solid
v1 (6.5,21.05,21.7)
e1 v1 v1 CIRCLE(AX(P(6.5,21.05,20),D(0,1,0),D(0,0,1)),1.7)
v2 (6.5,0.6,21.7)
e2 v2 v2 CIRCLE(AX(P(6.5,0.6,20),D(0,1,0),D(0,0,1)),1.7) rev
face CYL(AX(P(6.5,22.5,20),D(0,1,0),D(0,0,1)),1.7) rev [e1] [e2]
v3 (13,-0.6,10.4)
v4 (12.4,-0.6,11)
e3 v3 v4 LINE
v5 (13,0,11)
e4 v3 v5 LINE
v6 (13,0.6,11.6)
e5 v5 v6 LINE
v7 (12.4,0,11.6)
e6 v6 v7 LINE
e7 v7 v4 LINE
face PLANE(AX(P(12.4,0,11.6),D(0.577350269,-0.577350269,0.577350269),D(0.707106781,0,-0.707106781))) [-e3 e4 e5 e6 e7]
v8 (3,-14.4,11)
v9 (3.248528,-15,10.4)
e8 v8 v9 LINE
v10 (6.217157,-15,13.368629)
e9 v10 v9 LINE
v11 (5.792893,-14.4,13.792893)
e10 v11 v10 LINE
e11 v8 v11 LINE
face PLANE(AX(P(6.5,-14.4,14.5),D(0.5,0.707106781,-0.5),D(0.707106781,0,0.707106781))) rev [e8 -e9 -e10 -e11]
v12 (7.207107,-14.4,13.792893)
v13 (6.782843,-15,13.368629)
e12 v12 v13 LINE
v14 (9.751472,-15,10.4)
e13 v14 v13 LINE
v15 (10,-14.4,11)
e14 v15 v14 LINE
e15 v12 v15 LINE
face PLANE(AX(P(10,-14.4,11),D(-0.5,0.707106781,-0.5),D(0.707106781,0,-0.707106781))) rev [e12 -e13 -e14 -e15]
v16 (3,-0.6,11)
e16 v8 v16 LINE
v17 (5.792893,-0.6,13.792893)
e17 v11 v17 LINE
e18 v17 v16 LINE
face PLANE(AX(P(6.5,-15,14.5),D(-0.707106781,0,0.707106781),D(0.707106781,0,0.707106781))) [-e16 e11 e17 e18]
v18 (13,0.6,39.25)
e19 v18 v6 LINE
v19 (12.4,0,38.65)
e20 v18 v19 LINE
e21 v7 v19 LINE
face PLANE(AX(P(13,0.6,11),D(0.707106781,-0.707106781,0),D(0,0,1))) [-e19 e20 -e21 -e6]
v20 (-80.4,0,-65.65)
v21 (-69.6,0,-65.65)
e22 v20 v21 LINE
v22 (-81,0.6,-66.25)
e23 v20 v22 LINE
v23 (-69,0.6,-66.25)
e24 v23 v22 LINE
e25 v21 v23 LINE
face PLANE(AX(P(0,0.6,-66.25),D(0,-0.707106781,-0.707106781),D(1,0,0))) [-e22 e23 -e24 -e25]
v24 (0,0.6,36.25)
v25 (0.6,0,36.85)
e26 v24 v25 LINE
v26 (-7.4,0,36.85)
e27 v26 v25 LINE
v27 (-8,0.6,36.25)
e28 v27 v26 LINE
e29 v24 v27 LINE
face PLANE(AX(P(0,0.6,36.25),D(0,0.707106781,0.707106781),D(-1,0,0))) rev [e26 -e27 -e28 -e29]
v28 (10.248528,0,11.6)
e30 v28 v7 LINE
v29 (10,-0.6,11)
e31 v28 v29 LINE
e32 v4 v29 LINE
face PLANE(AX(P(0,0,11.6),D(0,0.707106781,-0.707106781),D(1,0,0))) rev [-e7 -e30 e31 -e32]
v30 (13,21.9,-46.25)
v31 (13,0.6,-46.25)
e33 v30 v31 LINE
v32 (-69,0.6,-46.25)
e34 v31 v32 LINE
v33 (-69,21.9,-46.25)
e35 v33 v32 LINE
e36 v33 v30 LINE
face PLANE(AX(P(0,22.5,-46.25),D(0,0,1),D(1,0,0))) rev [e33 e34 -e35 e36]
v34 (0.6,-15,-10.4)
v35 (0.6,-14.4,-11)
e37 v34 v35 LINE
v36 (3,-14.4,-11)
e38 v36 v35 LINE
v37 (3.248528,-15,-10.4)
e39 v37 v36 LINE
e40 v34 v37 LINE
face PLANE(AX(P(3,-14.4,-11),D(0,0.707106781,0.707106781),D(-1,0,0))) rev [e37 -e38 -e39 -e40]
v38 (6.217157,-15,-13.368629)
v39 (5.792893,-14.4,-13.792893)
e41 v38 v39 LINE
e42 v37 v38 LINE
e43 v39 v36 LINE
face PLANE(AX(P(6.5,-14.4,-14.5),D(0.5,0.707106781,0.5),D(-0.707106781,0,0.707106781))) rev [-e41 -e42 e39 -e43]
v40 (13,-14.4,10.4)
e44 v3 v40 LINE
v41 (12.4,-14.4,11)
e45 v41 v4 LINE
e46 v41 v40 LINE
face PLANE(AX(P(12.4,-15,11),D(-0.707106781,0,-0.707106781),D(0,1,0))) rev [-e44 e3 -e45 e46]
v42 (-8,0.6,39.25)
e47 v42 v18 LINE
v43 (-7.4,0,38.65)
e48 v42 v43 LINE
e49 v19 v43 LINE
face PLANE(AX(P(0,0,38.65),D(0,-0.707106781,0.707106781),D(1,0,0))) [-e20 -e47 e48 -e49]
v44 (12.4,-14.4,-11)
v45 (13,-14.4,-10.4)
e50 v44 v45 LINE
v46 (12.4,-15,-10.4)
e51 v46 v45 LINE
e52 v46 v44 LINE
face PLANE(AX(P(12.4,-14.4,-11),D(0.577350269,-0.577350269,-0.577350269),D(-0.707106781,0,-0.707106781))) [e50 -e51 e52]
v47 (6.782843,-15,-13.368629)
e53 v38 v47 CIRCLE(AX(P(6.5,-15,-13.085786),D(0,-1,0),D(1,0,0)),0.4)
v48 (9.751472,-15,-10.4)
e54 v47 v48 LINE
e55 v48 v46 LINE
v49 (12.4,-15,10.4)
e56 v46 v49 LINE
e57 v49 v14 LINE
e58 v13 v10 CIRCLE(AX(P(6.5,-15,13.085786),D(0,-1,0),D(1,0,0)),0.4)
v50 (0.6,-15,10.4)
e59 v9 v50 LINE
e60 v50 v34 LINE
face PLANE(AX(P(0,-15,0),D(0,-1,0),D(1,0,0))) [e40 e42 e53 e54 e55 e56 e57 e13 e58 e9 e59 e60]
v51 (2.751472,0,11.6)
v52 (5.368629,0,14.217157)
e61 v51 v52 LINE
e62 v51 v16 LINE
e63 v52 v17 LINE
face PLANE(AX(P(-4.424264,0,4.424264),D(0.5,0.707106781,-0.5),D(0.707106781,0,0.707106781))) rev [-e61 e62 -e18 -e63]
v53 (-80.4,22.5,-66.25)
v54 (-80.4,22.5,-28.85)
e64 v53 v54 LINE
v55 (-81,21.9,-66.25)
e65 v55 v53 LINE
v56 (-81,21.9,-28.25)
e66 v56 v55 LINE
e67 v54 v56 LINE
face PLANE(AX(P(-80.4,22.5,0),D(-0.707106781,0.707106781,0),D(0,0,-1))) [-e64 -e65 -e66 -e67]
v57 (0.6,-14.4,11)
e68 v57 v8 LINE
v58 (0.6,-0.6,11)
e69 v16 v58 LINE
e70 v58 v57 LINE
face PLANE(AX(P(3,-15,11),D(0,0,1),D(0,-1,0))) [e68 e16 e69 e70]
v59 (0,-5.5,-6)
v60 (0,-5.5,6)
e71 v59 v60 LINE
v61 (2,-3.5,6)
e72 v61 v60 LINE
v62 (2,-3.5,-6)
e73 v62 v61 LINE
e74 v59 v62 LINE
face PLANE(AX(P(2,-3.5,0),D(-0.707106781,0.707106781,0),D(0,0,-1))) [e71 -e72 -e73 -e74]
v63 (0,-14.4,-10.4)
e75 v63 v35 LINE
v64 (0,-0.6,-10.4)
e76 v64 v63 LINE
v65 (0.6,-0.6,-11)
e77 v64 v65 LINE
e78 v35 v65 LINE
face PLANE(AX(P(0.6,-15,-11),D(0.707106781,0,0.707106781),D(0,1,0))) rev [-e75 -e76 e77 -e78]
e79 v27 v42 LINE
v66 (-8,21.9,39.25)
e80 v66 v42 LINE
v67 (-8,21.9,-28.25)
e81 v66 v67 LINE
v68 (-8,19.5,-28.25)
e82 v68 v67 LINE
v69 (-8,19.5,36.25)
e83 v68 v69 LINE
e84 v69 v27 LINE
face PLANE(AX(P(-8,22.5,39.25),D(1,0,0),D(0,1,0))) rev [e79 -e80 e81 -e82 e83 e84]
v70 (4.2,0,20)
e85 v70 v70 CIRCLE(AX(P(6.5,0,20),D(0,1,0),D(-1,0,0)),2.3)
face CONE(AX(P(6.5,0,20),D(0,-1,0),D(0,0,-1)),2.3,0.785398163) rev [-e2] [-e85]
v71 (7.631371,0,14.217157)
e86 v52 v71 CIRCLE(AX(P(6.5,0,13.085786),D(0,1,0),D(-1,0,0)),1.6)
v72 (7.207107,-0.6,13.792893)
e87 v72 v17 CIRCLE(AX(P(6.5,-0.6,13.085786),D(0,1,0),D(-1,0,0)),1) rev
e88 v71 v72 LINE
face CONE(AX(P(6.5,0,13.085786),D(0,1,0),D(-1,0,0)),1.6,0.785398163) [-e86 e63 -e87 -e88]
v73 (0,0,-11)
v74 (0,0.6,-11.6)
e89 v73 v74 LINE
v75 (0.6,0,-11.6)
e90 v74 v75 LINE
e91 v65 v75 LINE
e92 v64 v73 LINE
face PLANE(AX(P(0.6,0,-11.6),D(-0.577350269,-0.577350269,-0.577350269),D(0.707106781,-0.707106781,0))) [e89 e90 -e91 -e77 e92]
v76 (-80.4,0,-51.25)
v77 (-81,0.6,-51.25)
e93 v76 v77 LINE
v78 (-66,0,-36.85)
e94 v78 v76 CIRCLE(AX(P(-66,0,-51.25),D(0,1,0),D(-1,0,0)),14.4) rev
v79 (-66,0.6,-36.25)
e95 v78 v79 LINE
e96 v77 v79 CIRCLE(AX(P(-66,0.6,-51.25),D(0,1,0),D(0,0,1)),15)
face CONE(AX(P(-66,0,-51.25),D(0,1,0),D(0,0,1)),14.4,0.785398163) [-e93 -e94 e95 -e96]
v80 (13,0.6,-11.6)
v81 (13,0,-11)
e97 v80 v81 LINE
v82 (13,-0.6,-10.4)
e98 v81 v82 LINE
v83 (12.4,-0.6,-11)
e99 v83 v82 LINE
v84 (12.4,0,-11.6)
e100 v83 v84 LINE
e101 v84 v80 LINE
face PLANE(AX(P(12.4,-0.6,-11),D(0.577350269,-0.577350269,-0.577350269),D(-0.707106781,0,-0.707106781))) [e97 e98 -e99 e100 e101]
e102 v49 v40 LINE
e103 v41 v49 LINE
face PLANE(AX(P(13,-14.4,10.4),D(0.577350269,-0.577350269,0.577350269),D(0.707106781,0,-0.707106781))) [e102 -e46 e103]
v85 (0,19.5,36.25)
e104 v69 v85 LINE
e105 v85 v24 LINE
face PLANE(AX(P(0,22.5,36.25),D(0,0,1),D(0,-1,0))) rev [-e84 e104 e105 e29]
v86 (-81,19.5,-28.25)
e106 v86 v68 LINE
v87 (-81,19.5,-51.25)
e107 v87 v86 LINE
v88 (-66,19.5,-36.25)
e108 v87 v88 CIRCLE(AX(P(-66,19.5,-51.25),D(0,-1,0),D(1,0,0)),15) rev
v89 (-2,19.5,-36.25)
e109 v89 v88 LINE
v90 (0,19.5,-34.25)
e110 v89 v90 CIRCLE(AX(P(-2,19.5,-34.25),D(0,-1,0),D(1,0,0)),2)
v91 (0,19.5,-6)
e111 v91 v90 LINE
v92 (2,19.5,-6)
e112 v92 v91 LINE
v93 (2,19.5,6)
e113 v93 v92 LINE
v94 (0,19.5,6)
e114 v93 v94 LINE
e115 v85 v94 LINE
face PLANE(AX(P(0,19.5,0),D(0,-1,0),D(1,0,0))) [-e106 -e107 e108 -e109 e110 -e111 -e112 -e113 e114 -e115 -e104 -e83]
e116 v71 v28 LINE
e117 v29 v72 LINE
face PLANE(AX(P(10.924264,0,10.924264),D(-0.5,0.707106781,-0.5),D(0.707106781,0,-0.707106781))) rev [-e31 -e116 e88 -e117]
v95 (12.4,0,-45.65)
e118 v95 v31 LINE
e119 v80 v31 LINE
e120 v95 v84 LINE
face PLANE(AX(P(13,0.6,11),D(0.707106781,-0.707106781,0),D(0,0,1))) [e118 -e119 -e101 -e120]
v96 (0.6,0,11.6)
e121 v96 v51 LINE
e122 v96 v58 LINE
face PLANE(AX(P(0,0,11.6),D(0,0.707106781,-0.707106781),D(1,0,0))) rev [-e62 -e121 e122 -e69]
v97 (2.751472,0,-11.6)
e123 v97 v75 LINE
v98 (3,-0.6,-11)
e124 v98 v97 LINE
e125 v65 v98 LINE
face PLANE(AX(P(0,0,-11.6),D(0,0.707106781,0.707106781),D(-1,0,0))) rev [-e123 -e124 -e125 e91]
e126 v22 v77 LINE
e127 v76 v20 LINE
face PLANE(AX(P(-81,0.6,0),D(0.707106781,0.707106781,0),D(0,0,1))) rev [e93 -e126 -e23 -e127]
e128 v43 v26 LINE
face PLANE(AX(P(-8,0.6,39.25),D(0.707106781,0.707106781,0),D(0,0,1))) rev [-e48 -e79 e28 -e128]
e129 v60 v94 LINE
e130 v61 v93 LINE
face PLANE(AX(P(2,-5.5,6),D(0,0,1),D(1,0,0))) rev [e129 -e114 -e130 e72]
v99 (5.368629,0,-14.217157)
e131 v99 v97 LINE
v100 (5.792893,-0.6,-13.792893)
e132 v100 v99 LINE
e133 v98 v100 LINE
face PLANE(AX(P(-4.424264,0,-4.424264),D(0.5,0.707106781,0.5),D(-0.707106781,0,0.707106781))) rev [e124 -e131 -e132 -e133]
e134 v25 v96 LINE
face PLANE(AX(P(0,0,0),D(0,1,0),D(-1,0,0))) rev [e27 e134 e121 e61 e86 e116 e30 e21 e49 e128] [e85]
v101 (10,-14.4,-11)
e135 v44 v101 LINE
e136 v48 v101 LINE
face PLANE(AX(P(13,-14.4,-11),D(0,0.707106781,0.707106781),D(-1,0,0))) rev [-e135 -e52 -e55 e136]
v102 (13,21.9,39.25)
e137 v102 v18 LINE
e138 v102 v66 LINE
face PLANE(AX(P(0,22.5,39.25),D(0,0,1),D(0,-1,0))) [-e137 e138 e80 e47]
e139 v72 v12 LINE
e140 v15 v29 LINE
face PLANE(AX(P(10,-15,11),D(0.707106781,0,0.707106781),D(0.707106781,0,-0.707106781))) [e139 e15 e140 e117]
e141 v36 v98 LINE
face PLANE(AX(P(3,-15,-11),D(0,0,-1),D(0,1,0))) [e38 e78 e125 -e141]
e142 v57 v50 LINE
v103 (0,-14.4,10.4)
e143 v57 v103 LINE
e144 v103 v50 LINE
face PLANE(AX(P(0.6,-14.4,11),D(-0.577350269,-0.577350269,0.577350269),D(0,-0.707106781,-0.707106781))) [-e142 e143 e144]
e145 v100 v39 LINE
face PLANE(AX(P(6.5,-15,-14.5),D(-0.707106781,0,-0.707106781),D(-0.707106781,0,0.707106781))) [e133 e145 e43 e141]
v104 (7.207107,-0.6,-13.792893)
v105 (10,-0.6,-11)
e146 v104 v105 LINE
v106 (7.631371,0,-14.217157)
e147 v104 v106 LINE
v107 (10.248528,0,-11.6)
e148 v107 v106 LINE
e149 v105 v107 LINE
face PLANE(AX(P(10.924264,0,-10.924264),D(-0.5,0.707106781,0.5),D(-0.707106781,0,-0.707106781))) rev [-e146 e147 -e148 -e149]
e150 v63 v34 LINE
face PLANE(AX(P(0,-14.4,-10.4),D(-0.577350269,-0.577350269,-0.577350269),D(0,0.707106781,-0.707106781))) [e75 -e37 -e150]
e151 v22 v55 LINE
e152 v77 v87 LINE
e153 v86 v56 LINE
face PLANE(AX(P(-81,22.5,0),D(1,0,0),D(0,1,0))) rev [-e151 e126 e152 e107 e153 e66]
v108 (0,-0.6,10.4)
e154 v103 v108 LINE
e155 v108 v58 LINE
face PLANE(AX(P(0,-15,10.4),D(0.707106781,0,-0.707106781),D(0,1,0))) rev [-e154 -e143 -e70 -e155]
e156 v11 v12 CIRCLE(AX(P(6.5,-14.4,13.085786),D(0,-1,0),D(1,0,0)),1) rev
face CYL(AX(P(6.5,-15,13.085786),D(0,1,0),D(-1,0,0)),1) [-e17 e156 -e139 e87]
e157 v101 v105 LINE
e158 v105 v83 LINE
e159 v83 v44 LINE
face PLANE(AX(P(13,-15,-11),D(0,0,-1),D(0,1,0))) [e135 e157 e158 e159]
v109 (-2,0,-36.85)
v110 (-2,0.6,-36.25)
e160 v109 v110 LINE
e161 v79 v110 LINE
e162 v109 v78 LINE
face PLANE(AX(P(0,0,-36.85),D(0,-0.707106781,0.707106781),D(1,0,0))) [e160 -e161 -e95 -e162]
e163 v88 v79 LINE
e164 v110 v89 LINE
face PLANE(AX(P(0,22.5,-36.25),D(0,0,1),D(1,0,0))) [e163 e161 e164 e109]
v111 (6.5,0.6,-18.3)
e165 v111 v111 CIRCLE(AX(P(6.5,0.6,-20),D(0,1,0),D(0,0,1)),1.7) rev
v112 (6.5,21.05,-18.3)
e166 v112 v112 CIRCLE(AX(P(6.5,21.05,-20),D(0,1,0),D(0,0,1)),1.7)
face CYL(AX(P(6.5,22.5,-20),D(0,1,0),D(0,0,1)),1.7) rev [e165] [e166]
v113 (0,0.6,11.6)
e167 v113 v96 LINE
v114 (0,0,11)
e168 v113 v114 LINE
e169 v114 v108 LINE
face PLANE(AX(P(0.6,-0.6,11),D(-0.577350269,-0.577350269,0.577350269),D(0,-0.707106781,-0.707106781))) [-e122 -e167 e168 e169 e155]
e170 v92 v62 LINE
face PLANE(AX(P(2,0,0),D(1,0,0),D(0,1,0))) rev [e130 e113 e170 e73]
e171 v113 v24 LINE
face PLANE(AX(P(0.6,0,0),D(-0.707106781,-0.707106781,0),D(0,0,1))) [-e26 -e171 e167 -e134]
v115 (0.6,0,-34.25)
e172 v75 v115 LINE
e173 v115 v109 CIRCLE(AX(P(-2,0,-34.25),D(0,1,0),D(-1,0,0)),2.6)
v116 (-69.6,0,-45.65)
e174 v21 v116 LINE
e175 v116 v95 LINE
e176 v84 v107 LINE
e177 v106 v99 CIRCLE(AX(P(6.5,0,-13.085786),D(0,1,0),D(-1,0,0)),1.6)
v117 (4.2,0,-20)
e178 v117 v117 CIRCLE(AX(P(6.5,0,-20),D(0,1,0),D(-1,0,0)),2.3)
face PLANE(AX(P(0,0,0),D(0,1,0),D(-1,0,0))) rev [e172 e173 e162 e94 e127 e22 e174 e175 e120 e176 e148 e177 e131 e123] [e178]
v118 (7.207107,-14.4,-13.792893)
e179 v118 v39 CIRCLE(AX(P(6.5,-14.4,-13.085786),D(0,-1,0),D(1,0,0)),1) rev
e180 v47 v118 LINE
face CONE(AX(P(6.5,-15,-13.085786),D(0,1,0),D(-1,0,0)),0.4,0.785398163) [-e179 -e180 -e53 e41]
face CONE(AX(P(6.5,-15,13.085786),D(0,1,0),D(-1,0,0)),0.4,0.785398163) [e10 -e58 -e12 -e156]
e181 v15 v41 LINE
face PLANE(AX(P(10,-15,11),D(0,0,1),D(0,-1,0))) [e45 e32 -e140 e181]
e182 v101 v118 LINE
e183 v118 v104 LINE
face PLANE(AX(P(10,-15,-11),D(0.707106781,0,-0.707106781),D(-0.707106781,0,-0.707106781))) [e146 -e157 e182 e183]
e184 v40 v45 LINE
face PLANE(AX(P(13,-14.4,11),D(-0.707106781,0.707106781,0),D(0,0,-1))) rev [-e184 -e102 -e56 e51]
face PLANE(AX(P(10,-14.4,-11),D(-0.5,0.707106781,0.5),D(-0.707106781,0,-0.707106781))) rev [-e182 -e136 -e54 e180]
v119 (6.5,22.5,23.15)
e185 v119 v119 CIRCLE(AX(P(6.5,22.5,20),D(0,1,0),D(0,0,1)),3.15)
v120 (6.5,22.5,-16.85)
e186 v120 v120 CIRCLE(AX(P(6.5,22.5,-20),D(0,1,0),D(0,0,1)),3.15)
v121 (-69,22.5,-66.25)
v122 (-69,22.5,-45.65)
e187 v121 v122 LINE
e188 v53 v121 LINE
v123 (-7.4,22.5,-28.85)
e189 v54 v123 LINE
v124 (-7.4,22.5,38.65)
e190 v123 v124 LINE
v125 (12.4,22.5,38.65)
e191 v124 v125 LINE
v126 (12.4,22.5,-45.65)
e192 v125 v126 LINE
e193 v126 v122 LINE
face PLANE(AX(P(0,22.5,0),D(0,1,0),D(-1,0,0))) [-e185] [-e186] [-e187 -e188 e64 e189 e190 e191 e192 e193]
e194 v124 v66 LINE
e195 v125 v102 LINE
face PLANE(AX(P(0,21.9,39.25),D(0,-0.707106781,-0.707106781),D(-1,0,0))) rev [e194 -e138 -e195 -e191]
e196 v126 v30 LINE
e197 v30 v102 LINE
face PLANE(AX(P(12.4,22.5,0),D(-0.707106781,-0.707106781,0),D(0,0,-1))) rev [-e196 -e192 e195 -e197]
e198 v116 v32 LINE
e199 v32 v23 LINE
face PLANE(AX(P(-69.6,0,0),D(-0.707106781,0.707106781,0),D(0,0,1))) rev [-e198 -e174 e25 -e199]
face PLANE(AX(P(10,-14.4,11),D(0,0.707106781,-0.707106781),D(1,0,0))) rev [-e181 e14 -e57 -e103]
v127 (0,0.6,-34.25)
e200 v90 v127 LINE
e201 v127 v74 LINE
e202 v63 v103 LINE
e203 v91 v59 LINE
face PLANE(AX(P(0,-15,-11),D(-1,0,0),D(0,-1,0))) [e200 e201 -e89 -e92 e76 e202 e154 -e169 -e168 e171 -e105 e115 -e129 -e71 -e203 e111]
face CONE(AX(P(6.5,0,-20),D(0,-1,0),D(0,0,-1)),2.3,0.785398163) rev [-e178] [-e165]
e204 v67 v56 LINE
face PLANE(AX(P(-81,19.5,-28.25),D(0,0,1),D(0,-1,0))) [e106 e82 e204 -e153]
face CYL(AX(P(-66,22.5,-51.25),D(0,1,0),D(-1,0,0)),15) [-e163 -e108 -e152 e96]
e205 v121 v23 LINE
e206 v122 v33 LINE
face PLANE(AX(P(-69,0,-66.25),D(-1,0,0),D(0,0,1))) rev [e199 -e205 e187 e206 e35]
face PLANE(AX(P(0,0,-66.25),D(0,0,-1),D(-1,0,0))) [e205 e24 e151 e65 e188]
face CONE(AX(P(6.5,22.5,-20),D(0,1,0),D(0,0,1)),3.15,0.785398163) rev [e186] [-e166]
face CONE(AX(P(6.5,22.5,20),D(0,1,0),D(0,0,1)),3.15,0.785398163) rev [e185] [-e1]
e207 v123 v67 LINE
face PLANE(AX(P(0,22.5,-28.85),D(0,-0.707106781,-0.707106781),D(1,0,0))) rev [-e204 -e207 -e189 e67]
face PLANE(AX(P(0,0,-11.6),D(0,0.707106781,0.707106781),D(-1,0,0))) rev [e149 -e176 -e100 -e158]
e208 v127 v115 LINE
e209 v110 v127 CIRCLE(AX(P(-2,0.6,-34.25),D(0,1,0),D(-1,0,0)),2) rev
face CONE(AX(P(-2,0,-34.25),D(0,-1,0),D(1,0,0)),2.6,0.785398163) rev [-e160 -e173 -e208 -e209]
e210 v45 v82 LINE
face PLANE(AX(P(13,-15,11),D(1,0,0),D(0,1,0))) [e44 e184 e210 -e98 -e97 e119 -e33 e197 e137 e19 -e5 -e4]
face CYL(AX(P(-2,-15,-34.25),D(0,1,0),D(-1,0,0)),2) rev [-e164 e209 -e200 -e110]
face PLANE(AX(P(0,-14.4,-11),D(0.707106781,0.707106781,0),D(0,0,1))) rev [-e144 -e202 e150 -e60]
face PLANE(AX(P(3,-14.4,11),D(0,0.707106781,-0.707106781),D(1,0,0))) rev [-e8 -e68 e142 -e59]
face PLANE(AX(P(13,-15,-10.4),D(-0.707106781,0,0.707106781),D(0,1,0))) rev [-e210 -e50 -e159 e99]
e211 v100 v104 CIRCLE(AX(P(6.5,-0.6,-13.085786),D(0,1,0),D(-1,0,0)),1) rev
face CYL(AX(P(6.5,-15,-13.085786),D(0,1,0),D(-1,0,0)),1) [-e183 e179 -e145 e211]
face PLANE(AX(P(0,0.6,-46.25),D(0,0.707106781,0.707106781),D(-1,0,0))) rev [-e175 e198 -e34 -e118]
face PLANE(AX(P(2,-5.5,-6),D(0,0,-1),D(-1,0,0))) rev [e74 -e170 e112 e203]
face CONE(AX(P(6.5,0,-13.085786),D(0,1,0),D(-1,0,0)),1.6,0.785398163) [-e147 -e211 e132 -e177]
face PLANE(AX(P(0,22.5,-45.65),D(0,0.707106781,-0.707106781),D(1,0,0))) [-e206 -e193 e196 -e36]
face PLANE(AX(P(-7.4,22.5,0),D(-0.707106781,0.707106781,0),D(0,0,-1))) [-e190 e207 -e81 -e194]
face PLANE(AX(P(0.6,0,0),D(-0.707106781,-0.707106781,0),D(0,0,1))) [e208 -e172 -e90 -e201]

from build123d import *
from OCP.BRepFilletAPI import BRepFilletAPI_MakeFillet

# Parameters (mm, degrees)
BOSS_EXTRUDE1_DEPTH                                 = 15
BOSS_EXTRUDE2_DEPTH                                 = 22.5
SKETCH3_W                                           = 8
SKETCH3_H                                           = 3
BOSS_EXTRUDE3_DEPTH                                 = 3
SKETCH8_W                                           = 12
SKETCH8_H                                           = 25
CUT_EXTRUDE1_DEPTH                                  = 2
CSK_FOR_M3_COUNTERSUNK_FLAT_HEAD_SCREW1_D           = 3.4
CSK_FOR_M3_COUNTERSUNK_FLAT_HEAD_SCREW1_CSINK_D     = 6.3
CSK_FOR_M3_COUNTERSUNK_FLAT_HEAD_SCREW1_CSINK_ANGLE = 90
SKETCH9_W                                           = 12
SKETCH9_H                                           = 22.5
BOSS_EXTRUDE4_DEPTH                                 = 20
FILLET1_R                                           = 15
FILLET2_R1                                          = 1
FILLET2_R2                                          = 2
CHAMFER1_SIZE                                       = 0.6
CHAMFER2_SIZE                                       = 2


with BuildPart() as part:
    # Sketch1 → Boss-Extrude1 (new body)
    with BuildSketch(Plane(origin=(0, 0, 0), x_dir=(1, 0, 0), z_dir=(0, 1, 0))):
        Polygon((6.5, 14.5), (3, 11), (0, 11), (0, -11), (3, -11), (6.5, -14.5), (10, -11), (13, -11), (13, 11), (10, 11), align=None)
    extrude(amount=-BOSS_EXTRUDE1_DEPTH)

    # Sketch2 → Boss-Extrude2 (add)
    with BuildSketch(Plane(origin=(0, 0, 0), x_dir=(1, 0, 0), z_dir=(0, 1, 0))):
        Polygon((0, -39.25), (13, -39.25), (13, -11), (10, -11), (6.5, -14.5), (3, -11), (0, -11), align=None)
        Polygon((10, 11), (13, 11), (13, 46.25), (-81, 46.25), (-81, 36.25), (0, 36.25), (0, 11), (3, 11), (6.5, 14.5), align=None)
        Polygon((3, 11), (0, 11), (0, -11), (3, -11), (6.5, -14.5), (10, -11), (13, -11), (13, 11), (10, 11), (6.5, 14.5), align=None)
    extrude(amount=BOSS_EXTRUDE2_DEPTH)

    # Sweep1: sweep along a curve in space
    with BuildLine() as sweep1_path:
        Line((0, 22.5, 39.25), (0, 0, 39.25))
    # Sketch3 → Sweep1 (sweep)
    with BuildSketch(Plane(origin=(0, 22.5, 0), x_dir=(1, 0, 0), z_dir=(0, 1, 0))):
        with Locations((-4, -37.75)):
            Rectangle(SKETCH3_W, SKETCH3_H)
    sweep(path=sweep1_path.line)

    # Sketch4 → Boss-Extrude3 (add)
    with BuildSketch(Plane(origin=(0, 22.5, 0), x_dir=(1, 0, 0), z_dir=(0, 1, 0))):
        Polygon((-8, -36.25), (0, -36.25), (0, 36.25), (-81, 36.25), (-81, 28.25), (-8, 28.25), align=None)
    extrude(amount=-BOSS_EXTRUDE3_DEPTH)

    # Sketch8 → Cut-Extrude1 (cut)
    with BuildSketch(Plane.ZY):
        with Locations((0, 7)):
            Rectangle(SKETCH8_W, SKETCH8_H)
    extrude(amount=-CUT_EXTRUDE1_DEPTH, mode=Mode.SUBTRACT)

    # CSK for M3 Countersunk Flat Head Screw1 (through all)
    with Locations(Plane(origin=(0, 22.5, 0), x_dir=(1, 0, 0), z_dir=(0, 1, 0))):
        with Locations((6.5, 20), (6.5, -20)):
            CounterSinkHole(CSK_FOR_M3_COUNTERSUNK_FLAT_HEAD_SCREW1_D / 2, CSK_FOR_M3_COUNTERSUNK_FLAT_HEAD_SCREW1_CSINK_D / 2, counter_sink_angle=CSK_FOR_M3_COUNTERSUNK_FLAT_HEAD_SCREW1_CSINK_ANGLE)

    # Sketch9 → Boss-Extrude4 (add)
    with BuildSketch(Plane(origin=(0, 0, -46.25), x_dir=(-1, 0, 0), z_dir=(0, 0, -1))):
        with Locations((75, 11.25)):
            Rectangle(SKETCH9_W, SKETCH9_H)
    extrude(amount=BOSS_EXTRUDE4_DEPTH)

    # Fillet1
    fillet1_edges = [part.edges().sort_by_distance(p)[0] for p in [
        (-81, 9.75, -36.25),
    ]]
    fillet(fillet1_edges, radius=FILLET1_R)

    # Fillet2: one fillet with a radius per group of edges: ONE call of the kernel's fillet builder (fillet() takes one radius for all edges)
    fillet2_edges_1 = [part.edges().sort_by_distance(p)[0] for p in [
        (6.5, -7.5, -14.5),
        (6.5, -7.5, 14.5),
    ]]
    fillet2_edges_2 = [part.edges().sort_by_distance(p)[0] for p in [
        (0, 9.75, -36.25),
    ]]
    fillet2 = BRepFilletAPI_MakeFillet(part.part.solid().wrapped)
    for e in fillet2_edges_1:
        fillet2.Add(FILLET2_R1, e.wrapped)
    for e in fillet2_edges_2:
        fillet2.Add(FILLET2_R2, e.wrapped)
    add(Compound.cast(fillet2.Shape()), mode=Mode.REPLACE)

    # Chamfer1
    chamfer1_edges = [part.edges().sort_by_distance(p)[0] for p in [
        (1.5, 0, -11),
        (8.2, 0, -20),
        (8.603553391, 0, -12.396446609),
        (8.2, 0, 20),
        (11.5, 0, -11),
        (-69, 0, -56.25),
        (-75, 0, -66.25),
        (11.5, 0, 11),
        (4.396446609, -15, 12.396446609),
        (4.396446609, 0, 12.396446609),
        (-76.606601718, 0, -40.643398282),
        (1.5, 0, 11),
        (-34, 0, -36.25),
        (4.396446609, 0, -12.396446609),
        (4.396446609, -15, -12.396446609),
        (8.603553391, -15, 12.396446609),
        (6.5, -15, 14.085786438),
        (6.5, -15, -14.085786438),
        (8.603553391, 0, 12.396446609),
        (-0.585786438, 0, -35.664213562),
        (6.5, 0, -14.085786438),
        (6.5, 0, 14.085786438),
        (0, -7.5, -11),
        (13, -7.5, -11),
        (13, -7.5, 11),
        (0, -7.5, 11),
        (11.5, -15, 11),
        (13, -15, 0),
        (11.5, -15, -11),
        (2.5, 0, 39.25),
        (8.603553391, -15, -12.396446609),
        (0, 0, -22.625),
        (2.5, 22.5, 39.25),
        (13, 0, 25.125),
        (13, 0, -28.625),
        (-28, 0, -46.25),
        (-81, 0, -58.75),
        (13, 22.5, -3.5),
        (-28, 22.5, -46.25),
        (-81, 22.5, -47.25),
        (1.5, -15, -11),
        (0, -15, 0),
        (0, 0, 23.625),
        (-8, 22.5, 5.5),
        (-4, 0, 36.25),
        (-8, 0, 37.75),
        (-44.5, 22.5, -28.25),
        (1.5, -15, 11),
    ]]
    chamfer(chamfer1_edges, length=CHAMFER1_SIZE)

    # Chamfer2
    chamfer2_edges = [part.edges().sort_by_distance(p)[0] for p in [
        (2, -5.5, 0),
    ]]
    chamfer(chamfer2_edges, length=CHAMFER2_SIZE - 0.0001)  # a hair under: the kernel refuses the full size


solid = part.part
